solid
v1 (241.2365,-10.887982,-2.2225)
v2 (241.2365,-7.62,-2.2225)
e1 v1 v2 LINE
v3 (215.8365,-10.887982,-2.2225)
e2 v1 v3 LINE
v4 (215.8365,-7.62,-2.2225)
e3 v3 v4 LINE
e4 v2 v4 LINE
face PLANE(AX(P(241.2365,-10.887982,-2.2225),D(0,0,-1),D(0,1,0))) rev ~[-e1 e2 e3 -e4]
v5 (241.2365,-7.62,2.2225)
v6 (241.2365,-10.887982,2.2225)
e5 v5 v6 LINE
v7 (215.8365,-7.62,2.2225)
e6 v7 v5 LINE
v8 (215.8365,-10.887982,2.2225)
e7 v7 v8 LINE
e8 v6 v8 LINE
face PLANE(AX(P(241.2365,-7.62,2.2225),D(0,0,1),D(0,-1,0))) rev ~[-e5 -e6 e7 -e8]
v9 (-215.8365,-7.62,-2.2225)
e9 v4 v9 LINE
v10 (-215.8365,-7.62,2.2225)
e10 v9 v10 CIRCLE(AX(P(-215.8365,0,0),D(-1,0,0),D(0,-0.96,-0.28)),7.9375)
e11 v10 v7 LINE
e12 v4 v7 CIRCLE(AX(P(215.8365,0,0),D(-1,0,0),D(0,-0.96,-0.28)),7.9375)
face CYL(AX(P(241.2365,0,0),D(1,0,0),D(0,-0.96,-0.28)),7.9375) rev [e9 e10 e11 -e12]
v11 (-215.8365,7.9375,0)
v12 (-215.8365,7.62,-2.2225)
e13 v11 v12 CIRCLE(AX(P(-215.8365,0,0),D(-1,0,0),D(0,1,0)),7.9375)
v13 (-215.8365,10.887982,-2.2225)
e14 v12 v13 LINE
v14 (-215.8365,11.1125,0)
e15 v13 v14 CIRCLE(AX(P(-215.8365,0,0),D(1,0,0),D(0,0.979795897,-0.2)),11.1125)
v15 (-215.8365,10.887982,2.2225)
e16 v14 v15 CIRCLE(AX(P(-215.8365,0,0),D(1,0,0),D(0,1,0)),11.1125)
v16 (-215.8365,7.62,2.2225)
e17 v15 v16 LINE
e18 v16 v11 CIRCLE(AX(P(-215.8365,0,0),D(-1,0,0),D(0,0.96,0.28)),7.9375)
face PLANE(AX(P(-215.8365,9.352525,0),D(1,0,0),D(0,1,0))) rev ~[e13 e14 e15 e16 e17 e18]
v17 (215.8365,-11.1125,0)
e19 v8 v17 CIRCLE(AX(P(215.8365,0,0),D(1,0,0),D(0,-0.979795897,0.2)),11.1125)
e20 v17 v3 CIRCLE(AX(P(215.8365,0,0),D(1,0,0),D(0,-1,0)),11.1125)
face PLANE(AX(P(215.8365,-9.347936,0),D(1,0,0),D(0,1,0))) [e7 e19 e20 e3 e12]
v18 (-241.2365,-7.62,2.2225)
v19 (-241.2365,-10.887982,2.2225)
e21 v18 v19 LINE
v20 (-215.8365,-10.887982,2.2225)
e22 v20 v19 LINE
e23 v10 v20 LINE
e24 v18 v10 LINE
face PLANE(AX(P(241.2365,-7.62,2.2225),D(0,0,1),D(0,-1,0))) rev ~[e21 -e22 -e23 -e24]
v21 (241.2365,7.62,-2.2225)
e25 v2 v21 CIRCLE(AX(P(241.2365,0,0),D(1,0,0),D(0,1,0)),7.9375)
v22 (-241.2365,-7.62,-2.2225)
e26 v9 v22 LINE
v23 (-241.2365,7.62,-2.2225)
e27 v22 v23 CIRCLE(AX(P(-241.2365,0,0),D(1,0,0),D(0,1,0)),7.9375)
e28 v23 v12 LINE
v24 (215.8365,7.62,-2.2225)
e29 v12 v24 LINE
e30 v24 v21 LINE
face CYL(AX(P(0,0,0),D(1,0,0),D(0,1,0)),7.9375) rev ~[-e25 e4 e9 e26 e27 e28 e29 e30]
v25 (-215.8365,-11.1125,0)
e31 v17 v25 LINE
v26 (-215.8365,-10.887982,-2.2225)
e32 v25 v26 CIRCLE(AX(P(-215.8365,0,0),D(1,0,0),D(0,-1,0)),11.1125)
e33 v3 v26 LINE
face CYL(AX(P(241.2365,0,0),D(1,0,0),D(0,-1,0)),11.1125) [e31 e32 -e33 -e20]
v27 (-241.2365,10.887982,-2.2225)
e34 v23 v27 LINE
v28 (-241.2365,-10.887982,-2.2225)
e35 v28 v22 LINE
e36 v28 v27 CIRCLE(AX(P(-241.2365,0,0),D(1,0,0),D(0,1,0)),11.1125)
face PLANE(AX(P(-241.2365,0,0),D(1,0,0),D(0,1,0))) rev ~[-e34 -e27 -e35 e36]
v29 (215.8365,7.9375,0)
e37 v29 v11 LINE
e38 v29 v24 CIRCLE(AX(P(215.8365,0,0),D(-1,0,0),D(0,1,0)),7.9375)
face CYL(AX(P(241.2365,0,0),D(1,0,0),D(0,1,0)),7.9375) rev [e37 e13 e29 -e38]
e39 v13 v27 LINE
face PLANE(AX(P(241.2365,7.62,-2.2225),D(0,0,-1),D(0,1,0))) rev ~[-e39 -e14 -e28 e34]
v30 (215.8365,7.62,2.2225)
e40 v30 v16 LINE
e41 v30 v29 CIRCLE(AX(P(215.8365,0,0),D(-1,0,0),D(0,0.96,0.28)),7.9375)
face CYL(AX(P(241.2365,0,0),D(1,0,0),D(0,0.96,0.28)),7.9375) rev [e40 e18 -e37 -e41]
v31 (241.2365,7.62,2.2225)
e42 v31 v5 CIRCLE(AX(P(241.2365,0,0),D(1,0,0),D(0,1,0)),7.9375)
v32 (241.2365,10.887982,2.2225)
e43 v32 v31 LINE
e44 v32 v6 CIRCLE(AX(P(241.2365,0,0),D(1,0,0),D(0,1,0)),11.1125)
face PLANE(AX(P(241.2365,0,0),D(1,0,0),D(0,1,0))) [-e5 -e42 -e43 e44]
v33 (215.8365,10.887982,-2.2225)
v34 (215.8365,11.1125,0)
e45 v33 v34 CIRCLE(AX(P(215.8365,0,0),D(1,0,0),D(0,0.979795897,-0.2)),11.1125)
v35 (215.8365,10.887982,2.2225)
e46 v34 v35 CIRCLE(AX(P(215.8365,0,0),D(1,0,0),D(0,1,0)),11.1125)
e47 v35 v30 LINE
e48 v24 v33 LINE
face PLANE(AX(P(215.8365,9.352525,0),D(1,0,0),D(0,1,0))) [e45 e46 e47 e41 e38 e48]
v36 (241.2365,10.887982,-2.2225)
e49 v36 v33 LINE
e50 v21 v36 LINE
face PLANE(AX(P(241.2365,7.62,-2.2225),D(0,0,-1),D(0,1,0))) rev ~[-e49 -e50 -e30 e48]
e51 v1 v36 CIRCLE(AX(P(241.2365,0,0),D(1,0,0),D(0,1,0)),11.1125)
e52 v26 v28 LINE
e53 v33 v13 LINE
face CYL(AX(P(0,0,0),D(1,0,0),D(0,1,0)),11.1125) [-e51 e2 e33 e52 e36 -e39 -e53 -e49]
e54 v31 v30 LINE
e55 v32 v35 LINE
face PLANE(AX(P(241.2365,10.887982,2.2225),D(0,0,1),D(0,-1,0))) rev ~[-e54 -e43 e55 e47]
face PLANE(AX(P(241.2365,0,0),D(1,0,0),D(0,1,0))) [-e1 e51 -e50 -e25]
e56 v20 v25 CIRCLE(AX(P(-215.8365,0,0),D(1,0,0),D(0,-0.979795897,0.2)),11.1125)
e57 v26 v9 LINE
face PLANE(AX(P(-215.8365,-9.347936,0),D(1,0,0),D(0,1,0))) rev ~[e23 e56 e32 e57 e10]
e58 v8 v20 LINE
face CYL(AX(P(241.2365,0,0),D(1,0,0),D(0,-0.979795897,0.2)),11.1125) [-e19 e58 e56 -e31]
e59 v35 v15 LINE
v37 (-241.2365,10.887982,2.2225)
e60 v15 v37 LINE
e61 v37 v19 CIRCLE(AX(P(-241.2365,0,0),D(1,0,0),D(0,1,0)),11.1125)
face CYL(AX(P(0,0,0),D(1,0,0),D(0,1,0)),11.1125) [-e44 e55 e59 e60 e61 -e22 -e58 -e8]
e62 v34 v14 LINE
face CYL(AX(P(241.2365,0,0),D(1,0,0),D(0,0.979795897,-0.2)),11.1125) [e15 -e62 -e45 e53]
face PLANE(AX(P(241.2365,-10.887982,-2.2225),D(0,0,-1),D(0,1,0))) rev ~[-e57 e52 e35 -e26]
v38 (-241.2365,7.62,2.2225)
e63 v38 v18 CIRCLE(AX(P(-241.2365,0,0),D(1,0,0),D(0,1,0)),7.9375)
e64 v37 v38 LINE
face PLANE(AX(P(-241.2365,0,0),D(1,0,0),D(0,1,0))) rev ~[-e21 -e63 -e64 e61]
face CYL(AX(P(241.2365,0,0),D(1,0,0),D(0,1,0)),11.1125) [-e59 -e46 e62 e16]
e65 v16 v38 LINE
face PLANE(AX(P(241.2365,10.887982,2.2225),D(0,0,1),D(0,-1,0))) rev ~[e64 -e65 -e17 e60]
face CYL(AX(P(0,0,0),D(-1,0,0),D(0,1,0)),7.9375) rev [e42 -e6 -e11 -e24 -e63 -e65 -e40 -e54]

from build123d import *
from build123d import SkipClean  # not in build123d's __all__

# Parameters (mm, degrees)
F0_R          = 11.1125
F0_R_2        = 7.9375
F1_DEPTH      = 241.2365
F1_DEPTH_BACK = 241.2365
F3_DEPTH      = 482.474
F4_DEPTH      = 457.073
F5_DEPTH      = 25.4


with BuildPart() as f1:
    # F0 (on Right) → F1 (new body, two sides)
    with BuildSketch(Plane.YZ) as f1_sk:
        Circle(F0_R)
        Circle(F0_R_2, mode=Mode.SUBTRACT)
    extrude(amount=F1_DEPTH)
    extrude(f1_sk.sketch, amount=-F1_DEPTH_BACK)

    # F2 (on face) → F3 (cut, through all)
    with BuildSketch(Plane.YZ.offset(241.2365)):
        with BuildLine():
            Line((-7.62, 2.2225), (-10.8879819067, 2.2225))
            ThreePointArc((-10.8879819067, 2.2225), (-11.0562280003, 1.1169058403), (-11.1125, 0))
            ThreePointArc((-11.1125, 0), (-11.0562280003, -1.1169058403), (-10.8879819067, -2.2225))
            Line((-10.8879819067, -2.2225), (-7.62, -2.2225))
            ThreePointArc((-7.62, -2.2225), (-7.9375, 0), (-7.62, 2.2225))
        make_face()
        with BuildLine():
            ThreePointArc((11.1125, 0), (11.0562280003, 1.1169058403), (10.8879819067, 2.2225))
            Line((10.8879819067, 2.2225), (7.62, 2.2225))
            ThreePointArc((7.62, 2.2225), (7.8577241059, 1.1225320151), (7.9375, 0))
            ThreePointArc((7.9375, 0), (7.8577241059, -1.1225320151), (7.62, -2.2225))
            Line((7.62, -2.2225), (10.8879819067, -2.2225))
            ThreePointArc((10.8879819067, -2.2225), (11.0562280003, -1.1169058403), (11.1125, 0))
        make_face()
    extrude(amount=-F3_DEPTH, mode=Mode.SUBTRACT)

    # F2 (on face) → F4 (join)
    with BuildSketch(Plane.YZ.offset(241.2365)):
        with BuildLine():
            Line((-7.62, 2.2225), (-10.8879819067, 2.2225))
            ThreePointArc((-10.8879819067, 2.2225), (-11.0562280003, 1.1169058403), (-11.1125, 0))
            ThreePointArc((-11.1125, 0), (-11.0562280003, -1.1169058403), (-10.8879819067, -2.2225))
            Line((-10.8879819067, -2.2225), (-7.62, -2.2225))
            ThreePointArc((-7.62, -2.2225), (-7.9375, 0), (-7.62, 2.2225))
        make_face()
        with BuildLine():
            ThreePointArc((11.1125, 0), (11.0562280003, 1.1169058403), (10.8879819067, 2.2225))
            Line((10.8879819067, 2.2225), (7.62, 2.2225))
            ThreePointArc((7.62, 2.2225), (7.8577241059, 1.1225320151), (7.9375, 0))
            ThreePointArc((7.9375, 0), (7.8577241059, -1.1225320151), (7.62, -2.2225))
            Line((7.62, -2.2225), (10.8879819067, -2.2225))
            ThreePointArc((10.8879819067, -2.2225), (11.0562280003, -1.1169058403), (11.1125, 0))
        make_face()
    with SkipClean():  # cleaning this boolean's faces spoils the solid; the shape is the same uncleaned
        extrude(amount=-F4_DEPTH)

    # F2 (on face) → F5 (cut)
    with BuildSketch(Plane.YZ.offset(241.2365)):
        with BuildLine():
            Line((-7.62, 2.2225), (-10.8879819067, 2.2225))
            ThreePointArc((-10.8879819067, 2.2225), (-11.0562280003, 1.1169058403), (-11.1125, 0))
            ThreePointArc((-11.1125, 0), (-11.0562280003, -1.1169058403), (-10.8879819067, -2.2225))
            Line((-10.8879819067, -2.2225), (-7.62, -2.2225))
            ThreePointArc((-7.62, -2.2225), (-7.9375, 0), (-7.62, 2.2225))
        make_face()
        with BuildLine():
            ThreePointArc((11.1125, 0), (11.0562280003, 1.1169058403), (10.8879819067, 2.2225))
            Line((10.8879819067, 2.2225), (7.62, 2.2225))
            ThreePointArc((7.62, 2.2225), (7.8577241059, 1.1225320151), (7.9375, 0))
            ThreePointArc((7.9375, 0), (7.8577241059, -1.1225320151), (7.62, -2.2225))
            Line((7.62, -2.2225), (10.8879819067, -2.2225))
            ThreePointArc((10.8879819067, -2.2225), (11.0562280003, -1.1169058403), (11.1125, 0))
        make_face()
    with SkipClean():  # cleaning this boolean's faces spoils the solid; the shape is the same uncleaned
        extrude(amount=-F5_DEPTH, mode=Mode.SUBTRACT)


solid = f1.part
